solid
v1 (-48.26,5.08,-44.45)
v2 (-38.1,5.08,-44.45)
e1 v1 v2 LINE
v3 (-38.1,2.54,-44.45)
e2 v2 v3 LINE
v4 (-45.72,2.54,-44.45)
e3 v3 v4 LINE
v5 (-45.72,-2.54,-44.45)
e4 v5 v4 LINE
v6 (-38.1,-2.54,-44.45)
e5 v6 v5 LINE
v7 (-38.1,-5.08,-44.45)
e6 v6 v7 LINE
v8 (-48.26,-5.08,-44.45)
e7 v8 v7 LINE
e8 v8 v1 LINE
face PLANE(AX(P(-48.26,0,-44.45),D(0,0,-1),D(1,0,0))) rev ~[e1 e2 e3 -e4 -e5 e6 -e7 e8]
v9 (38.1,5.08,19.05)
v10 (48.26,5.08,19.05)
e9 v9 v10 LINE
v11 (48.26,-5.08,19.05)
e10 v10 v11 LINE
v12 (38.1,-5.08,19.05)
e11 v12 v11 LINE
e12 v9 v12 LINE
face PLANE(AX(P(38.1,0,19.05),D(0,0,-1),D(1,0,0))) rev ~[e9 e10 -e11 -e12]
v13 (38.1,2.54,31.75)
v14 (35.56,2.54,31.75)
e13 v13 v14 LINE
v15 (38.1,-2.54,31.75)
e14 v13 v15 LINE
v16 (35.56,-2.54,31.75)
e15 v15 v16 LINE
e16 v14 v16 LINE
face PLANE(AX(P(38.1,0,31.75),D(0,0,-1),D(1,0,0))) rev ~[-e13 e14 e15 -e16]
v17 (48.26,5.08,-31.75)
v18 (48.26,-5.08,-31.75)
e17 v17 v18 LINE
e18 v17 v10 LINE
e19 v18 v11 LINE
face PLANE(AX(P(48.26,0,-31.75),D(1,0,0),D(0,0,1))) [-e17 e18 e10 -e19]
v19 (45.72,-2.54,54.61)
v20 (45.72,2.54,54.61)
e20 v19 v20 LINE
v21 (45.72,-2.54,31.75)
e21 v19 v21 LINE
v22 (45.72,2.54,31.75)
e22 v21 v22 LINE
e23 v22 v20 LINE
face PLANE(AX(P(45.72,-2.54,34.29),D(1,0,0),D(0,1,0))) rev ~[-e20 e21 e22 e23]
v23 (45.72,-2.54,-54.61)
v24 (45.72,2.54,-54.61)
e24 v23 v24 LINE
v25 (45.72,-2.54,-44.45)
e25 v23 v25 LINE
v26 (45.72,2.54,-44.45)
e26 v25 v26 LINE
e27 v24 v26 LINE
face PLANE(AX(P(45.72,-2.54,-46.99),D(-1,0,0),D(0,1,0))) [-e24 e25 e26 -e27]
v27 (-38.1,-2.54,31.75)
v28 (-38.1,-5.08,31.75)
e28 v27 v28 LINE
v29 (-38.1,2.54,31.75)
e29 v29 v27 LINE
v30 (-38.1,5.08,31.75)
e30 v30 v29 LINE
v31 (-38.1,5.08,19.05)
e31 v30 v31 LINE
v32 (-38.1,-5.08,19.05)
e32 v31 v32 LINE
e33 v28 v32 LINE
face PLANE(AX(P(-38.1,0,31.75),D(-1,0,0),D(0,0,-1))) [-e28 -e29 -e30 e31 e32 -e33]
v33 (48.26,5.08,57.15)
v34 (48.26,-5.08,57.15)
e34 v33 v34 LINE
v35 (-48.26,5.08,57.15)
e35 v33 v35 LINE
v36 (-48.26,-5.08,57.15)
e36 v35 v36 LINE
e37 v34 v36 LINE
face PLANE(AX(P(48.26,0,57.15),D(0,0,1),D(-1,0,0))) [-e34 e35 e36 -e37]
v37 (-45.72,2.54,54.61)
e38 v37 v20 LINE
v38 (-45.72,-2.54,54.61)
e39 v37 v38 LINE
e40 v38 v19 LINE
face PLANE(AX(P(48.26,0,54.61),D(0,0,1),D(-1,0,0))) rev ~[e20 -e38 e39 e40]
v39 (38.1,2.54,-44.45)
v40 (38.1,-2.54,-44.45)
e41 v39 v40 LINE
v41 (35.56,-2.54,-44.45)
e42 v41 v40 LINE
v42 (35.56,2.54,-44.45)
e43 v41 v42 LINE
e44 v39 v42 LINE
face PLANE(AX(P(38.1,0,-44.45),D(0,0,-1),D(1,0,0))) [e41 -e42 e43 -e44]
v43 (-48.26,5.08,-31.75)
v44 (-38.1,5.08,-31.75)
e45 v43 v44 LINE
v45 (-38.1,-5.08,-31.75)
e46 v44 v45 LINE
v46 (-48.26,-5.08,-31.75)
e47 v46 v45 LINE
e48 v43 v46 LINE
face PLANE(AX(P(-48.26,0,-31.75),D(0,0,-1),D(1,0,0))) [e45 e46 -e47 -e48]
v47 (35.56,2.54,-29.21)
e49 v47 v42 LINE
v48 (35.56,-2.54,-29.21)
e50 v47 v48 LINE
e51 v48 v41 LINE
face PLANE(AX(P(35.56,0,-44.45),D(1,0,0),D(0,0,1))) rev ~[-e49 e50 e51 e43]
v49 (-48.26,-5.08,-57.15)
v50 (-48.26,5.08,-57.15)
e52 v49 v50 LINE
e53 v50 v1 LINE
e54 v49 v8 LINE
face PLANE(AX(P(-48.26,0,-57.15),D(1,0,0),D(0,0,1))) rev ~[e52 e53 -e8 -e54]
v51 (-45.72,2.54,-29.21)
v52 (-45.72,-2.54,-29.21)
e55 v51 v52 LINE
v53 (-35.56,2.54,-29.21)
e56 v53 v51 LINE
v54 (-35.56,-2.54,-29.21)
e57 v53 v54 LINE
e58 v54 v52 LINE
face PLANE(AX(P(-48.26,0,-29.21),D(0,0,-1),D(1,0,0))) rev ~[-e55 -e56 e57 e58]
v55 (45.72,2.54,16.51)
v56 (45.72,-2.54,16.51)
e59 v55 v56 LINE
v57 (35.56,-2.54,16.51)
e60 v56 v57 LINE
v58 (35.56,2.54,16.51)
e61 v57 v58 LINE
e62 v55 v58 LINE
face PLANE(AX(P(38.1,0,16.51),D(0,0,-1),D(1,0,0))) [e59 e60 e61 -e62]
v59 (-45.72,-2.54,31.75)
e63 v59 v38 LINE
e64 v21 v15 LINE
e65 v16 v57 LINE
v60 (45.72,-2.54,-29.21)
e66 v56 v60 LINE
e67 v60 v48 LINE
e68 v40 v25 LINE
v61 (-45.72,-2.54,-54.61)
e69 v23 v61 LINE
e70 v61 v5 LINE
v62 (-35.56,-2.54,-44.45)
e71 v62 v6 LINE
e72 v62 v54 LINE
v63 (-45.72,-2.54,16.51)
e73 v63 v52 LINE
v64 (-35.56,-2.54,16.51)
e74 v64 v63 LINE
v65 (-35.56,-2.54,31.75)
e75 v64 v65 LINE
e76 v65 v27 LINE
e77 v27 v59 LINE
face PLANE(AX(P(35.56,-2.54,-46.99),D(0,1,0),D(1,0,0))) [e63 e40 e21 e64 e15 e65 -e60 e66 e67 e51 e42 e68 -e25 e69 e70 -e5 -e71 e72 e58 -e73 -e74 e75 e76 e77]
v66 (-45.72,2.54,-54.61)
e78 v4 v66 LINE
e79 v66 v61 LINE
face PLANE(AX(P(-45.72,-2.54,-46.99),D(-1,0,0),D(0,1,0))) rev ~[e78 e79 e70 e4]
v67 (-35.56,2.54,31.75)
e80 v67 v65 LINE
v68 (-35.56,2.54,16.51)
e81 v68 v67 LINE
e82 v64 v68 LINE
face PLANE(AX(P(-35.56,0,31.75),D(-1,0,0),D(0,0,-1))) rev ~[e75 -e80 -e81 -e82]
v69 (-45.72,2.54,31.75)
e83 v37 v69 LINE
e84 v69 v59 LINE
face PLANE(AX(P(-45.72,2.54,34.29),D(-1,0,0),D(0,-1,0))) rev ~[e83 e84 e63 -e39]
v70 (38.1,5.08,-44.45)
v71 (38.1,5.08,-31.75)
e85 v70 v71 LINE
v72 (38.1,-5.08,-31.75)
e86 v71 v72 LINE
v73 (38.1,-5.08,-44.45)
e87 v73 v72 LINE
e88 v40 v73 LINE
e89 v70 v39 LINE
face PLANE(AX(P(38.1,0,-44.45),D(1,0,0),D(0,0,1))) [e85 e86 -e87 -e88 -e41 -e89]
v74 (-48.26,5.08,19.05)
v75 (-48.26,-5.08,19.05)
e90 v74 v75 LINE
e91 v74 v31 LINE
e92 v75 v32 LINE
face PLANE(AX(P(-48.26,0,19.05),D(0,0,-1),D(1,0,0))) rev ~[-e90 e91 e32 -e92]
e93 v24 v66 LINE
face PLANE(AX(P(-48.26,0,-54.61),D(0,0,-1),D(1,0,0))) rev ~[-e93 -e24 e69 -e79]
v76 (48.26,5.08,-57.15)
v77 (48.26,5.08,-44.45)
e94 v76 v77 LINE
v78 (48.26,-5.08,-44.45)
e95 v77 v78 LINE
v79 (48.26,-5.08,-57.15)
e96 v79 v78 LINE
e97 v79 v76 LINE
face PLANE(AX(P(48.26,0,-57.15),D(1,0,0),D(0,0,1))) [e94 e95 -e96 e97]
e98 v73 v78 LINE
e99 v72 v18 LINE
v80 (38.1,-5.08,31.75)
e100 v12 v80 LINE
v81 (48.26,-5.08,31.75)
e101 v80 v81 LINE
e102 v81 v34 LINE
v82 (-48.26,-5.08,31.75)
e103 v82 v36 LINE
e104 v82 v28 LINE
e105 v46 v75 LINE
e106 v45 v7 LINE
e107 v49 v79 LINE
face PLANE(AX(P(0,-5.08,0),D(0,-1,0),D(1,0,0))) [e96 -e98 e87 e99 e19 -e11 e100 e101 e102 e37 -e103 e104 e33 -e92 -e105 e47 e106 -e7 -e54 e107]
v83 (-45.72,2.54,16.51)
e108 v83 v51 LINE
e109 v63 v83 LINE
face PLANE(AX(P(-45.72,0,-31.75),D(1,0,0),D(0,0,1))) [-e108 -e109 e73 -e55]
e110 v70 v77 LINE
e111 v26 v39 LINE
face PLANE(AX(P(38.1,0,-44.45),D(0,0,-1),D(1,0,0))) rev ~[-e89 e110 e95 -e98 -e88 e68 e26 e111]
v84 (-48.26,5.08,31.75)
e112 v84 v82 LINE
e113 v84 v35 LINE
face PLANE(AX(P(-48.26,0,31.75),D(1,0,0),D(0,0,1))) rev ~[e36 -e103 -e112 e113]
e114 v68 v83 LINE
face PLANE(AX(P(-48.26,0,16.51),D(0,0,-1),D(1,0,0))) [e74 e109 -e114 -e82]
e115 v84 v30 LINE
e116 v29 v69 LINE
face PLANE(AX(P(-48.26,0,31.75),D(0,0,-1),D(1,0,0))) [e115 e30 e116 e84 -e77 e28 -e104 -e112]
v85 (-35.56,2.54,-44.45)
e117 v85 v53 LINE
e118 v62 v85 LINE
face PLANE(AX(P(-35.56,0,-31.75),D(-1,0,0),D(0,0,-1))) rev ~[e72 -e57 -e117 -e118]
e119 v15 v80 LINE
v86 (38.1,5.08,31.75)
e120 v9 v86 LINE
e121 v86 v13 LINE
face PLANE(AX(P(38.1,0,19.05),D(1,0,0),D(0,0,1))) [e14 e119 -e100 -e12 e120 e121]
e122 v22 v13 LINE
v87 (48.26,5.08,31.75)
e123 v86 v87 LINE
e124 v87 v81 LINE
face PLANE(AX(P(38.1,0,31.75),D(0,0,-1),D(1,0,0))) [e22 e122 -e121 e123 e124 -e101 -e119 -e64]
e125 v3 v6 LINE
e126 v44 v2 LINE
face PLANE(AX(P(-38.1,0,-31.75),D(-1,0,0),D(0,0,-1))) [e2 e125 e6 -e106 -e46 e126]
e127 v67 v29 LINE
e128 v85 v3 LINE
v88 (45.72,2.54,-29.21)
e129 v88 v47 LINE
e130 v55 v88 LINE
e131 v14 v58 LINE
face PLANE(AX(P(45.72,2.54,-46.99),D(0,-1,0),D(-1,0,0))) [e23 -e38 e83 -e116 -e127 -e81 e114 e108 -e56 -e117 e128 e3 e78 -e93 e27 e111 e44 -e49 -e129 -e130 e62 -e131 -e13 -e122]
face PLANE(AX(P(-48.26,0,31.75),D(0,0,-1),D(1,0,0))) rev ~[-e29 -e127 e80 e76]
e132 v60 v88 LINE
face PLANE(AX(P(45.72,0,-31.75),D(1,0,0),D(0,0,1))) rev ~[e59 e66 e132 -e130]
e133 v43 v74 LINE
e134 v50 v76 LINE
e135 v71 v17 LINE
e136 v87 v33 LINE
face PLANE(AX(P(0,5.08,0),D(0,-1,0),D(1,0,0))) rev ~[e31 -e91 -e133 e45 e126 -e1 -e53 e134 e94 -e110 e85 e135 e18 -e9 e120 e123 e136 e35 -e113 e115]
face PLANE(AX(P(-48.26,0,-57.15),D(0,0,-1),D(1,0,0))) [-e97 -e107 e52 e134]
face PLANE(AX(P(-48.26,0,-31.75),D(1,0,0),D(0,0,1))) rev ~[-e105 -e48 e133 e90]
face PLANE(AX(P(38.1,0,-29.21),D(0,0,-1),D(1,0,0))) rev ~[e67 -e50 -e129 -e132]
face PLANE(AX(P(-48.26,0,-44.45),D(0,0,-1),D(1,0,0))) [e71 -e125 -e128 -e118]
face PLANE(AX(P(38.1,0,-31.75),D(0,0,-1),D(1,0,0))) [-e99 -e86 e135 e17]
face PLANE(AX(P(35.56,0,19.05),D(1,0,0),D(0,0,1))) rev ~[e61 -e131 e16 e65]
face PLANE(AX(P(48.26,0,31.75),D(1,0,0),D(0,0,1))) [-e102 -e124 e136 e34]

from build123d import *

# Parameters (mm, degrees)
F0_W     = 10.16
F0_H     = 12.7
F0_H_2   = 50.8
F0_H_3   = 25.4
F1_DEPTH = 5.08
F2_T     = -2.54


# Not quite as in the source:
# - a shell that OpenCascade refuses in one call is made with other operations: the cavity is built on its own and cut out


with BuildPart() as f1:
    # F0 (on Front) → F1 (new body, symmetric)
    with BuildSketch(Plane.XZ):
        Polygon((-38.1, -57.15), (38.1, -57.15), (38.1, -44.45), (38.1, -31.75), (38.1, 19.05), (38.1, 31.75), (38.1, 57.15), (-38.1, 57.15), (-38.1, 31.75), (-38.1, 19.05), (-38.1, -31.75), (-38.1, -44.45), align=None)
        with Locations((43.18, -50.8)):
            Rectangle(F0_W, F0_H)
        with Locations((-43.18, -50.8)):
            Rectangle(F0_W, F0_H)
        with Locations((43.18, -6.35)):
            Rectangle(F0_W, F0_H_2)
        with Locations((-43.18, -6.35)):
            Rectangle(F0_W, F0_H_2)
        with Locations((43.18, 44.45)):
            Rectangle(F0_W, F0_H_3)
        with Locations((-43.18, 44.45)):
            Rectangle(F0_W, F0_H_3)
    extrude(amount=F1_DEPTH, both=True)

    # F2: a shell. OpenCascade refuses it in one call, so the cavity is built on its own and cut out:
    # the body offset inwards by the wall thickness, plus a prism from it out through each open face.
    f2_core = offset(f1.part, amount=F2_T, kind=Kind.INTERSECTION, mode=Mode.PRIVATE)
    f2_exits = [f2_core.faces().sort_by_distance(p)[0] for p in [
        (40.64, 0, 34.29),
        (40.64, 0, -46.99),
        (-40.64, 0, -46.99),
        (-40.64, 0, 34.29),
    ]]
    add(f2_core, mode=Mode.SUBTRACT)
    extrude(f2_exits, amount=-F2_T, mode=Mode.SUBTRACT)


solid = f1.part
